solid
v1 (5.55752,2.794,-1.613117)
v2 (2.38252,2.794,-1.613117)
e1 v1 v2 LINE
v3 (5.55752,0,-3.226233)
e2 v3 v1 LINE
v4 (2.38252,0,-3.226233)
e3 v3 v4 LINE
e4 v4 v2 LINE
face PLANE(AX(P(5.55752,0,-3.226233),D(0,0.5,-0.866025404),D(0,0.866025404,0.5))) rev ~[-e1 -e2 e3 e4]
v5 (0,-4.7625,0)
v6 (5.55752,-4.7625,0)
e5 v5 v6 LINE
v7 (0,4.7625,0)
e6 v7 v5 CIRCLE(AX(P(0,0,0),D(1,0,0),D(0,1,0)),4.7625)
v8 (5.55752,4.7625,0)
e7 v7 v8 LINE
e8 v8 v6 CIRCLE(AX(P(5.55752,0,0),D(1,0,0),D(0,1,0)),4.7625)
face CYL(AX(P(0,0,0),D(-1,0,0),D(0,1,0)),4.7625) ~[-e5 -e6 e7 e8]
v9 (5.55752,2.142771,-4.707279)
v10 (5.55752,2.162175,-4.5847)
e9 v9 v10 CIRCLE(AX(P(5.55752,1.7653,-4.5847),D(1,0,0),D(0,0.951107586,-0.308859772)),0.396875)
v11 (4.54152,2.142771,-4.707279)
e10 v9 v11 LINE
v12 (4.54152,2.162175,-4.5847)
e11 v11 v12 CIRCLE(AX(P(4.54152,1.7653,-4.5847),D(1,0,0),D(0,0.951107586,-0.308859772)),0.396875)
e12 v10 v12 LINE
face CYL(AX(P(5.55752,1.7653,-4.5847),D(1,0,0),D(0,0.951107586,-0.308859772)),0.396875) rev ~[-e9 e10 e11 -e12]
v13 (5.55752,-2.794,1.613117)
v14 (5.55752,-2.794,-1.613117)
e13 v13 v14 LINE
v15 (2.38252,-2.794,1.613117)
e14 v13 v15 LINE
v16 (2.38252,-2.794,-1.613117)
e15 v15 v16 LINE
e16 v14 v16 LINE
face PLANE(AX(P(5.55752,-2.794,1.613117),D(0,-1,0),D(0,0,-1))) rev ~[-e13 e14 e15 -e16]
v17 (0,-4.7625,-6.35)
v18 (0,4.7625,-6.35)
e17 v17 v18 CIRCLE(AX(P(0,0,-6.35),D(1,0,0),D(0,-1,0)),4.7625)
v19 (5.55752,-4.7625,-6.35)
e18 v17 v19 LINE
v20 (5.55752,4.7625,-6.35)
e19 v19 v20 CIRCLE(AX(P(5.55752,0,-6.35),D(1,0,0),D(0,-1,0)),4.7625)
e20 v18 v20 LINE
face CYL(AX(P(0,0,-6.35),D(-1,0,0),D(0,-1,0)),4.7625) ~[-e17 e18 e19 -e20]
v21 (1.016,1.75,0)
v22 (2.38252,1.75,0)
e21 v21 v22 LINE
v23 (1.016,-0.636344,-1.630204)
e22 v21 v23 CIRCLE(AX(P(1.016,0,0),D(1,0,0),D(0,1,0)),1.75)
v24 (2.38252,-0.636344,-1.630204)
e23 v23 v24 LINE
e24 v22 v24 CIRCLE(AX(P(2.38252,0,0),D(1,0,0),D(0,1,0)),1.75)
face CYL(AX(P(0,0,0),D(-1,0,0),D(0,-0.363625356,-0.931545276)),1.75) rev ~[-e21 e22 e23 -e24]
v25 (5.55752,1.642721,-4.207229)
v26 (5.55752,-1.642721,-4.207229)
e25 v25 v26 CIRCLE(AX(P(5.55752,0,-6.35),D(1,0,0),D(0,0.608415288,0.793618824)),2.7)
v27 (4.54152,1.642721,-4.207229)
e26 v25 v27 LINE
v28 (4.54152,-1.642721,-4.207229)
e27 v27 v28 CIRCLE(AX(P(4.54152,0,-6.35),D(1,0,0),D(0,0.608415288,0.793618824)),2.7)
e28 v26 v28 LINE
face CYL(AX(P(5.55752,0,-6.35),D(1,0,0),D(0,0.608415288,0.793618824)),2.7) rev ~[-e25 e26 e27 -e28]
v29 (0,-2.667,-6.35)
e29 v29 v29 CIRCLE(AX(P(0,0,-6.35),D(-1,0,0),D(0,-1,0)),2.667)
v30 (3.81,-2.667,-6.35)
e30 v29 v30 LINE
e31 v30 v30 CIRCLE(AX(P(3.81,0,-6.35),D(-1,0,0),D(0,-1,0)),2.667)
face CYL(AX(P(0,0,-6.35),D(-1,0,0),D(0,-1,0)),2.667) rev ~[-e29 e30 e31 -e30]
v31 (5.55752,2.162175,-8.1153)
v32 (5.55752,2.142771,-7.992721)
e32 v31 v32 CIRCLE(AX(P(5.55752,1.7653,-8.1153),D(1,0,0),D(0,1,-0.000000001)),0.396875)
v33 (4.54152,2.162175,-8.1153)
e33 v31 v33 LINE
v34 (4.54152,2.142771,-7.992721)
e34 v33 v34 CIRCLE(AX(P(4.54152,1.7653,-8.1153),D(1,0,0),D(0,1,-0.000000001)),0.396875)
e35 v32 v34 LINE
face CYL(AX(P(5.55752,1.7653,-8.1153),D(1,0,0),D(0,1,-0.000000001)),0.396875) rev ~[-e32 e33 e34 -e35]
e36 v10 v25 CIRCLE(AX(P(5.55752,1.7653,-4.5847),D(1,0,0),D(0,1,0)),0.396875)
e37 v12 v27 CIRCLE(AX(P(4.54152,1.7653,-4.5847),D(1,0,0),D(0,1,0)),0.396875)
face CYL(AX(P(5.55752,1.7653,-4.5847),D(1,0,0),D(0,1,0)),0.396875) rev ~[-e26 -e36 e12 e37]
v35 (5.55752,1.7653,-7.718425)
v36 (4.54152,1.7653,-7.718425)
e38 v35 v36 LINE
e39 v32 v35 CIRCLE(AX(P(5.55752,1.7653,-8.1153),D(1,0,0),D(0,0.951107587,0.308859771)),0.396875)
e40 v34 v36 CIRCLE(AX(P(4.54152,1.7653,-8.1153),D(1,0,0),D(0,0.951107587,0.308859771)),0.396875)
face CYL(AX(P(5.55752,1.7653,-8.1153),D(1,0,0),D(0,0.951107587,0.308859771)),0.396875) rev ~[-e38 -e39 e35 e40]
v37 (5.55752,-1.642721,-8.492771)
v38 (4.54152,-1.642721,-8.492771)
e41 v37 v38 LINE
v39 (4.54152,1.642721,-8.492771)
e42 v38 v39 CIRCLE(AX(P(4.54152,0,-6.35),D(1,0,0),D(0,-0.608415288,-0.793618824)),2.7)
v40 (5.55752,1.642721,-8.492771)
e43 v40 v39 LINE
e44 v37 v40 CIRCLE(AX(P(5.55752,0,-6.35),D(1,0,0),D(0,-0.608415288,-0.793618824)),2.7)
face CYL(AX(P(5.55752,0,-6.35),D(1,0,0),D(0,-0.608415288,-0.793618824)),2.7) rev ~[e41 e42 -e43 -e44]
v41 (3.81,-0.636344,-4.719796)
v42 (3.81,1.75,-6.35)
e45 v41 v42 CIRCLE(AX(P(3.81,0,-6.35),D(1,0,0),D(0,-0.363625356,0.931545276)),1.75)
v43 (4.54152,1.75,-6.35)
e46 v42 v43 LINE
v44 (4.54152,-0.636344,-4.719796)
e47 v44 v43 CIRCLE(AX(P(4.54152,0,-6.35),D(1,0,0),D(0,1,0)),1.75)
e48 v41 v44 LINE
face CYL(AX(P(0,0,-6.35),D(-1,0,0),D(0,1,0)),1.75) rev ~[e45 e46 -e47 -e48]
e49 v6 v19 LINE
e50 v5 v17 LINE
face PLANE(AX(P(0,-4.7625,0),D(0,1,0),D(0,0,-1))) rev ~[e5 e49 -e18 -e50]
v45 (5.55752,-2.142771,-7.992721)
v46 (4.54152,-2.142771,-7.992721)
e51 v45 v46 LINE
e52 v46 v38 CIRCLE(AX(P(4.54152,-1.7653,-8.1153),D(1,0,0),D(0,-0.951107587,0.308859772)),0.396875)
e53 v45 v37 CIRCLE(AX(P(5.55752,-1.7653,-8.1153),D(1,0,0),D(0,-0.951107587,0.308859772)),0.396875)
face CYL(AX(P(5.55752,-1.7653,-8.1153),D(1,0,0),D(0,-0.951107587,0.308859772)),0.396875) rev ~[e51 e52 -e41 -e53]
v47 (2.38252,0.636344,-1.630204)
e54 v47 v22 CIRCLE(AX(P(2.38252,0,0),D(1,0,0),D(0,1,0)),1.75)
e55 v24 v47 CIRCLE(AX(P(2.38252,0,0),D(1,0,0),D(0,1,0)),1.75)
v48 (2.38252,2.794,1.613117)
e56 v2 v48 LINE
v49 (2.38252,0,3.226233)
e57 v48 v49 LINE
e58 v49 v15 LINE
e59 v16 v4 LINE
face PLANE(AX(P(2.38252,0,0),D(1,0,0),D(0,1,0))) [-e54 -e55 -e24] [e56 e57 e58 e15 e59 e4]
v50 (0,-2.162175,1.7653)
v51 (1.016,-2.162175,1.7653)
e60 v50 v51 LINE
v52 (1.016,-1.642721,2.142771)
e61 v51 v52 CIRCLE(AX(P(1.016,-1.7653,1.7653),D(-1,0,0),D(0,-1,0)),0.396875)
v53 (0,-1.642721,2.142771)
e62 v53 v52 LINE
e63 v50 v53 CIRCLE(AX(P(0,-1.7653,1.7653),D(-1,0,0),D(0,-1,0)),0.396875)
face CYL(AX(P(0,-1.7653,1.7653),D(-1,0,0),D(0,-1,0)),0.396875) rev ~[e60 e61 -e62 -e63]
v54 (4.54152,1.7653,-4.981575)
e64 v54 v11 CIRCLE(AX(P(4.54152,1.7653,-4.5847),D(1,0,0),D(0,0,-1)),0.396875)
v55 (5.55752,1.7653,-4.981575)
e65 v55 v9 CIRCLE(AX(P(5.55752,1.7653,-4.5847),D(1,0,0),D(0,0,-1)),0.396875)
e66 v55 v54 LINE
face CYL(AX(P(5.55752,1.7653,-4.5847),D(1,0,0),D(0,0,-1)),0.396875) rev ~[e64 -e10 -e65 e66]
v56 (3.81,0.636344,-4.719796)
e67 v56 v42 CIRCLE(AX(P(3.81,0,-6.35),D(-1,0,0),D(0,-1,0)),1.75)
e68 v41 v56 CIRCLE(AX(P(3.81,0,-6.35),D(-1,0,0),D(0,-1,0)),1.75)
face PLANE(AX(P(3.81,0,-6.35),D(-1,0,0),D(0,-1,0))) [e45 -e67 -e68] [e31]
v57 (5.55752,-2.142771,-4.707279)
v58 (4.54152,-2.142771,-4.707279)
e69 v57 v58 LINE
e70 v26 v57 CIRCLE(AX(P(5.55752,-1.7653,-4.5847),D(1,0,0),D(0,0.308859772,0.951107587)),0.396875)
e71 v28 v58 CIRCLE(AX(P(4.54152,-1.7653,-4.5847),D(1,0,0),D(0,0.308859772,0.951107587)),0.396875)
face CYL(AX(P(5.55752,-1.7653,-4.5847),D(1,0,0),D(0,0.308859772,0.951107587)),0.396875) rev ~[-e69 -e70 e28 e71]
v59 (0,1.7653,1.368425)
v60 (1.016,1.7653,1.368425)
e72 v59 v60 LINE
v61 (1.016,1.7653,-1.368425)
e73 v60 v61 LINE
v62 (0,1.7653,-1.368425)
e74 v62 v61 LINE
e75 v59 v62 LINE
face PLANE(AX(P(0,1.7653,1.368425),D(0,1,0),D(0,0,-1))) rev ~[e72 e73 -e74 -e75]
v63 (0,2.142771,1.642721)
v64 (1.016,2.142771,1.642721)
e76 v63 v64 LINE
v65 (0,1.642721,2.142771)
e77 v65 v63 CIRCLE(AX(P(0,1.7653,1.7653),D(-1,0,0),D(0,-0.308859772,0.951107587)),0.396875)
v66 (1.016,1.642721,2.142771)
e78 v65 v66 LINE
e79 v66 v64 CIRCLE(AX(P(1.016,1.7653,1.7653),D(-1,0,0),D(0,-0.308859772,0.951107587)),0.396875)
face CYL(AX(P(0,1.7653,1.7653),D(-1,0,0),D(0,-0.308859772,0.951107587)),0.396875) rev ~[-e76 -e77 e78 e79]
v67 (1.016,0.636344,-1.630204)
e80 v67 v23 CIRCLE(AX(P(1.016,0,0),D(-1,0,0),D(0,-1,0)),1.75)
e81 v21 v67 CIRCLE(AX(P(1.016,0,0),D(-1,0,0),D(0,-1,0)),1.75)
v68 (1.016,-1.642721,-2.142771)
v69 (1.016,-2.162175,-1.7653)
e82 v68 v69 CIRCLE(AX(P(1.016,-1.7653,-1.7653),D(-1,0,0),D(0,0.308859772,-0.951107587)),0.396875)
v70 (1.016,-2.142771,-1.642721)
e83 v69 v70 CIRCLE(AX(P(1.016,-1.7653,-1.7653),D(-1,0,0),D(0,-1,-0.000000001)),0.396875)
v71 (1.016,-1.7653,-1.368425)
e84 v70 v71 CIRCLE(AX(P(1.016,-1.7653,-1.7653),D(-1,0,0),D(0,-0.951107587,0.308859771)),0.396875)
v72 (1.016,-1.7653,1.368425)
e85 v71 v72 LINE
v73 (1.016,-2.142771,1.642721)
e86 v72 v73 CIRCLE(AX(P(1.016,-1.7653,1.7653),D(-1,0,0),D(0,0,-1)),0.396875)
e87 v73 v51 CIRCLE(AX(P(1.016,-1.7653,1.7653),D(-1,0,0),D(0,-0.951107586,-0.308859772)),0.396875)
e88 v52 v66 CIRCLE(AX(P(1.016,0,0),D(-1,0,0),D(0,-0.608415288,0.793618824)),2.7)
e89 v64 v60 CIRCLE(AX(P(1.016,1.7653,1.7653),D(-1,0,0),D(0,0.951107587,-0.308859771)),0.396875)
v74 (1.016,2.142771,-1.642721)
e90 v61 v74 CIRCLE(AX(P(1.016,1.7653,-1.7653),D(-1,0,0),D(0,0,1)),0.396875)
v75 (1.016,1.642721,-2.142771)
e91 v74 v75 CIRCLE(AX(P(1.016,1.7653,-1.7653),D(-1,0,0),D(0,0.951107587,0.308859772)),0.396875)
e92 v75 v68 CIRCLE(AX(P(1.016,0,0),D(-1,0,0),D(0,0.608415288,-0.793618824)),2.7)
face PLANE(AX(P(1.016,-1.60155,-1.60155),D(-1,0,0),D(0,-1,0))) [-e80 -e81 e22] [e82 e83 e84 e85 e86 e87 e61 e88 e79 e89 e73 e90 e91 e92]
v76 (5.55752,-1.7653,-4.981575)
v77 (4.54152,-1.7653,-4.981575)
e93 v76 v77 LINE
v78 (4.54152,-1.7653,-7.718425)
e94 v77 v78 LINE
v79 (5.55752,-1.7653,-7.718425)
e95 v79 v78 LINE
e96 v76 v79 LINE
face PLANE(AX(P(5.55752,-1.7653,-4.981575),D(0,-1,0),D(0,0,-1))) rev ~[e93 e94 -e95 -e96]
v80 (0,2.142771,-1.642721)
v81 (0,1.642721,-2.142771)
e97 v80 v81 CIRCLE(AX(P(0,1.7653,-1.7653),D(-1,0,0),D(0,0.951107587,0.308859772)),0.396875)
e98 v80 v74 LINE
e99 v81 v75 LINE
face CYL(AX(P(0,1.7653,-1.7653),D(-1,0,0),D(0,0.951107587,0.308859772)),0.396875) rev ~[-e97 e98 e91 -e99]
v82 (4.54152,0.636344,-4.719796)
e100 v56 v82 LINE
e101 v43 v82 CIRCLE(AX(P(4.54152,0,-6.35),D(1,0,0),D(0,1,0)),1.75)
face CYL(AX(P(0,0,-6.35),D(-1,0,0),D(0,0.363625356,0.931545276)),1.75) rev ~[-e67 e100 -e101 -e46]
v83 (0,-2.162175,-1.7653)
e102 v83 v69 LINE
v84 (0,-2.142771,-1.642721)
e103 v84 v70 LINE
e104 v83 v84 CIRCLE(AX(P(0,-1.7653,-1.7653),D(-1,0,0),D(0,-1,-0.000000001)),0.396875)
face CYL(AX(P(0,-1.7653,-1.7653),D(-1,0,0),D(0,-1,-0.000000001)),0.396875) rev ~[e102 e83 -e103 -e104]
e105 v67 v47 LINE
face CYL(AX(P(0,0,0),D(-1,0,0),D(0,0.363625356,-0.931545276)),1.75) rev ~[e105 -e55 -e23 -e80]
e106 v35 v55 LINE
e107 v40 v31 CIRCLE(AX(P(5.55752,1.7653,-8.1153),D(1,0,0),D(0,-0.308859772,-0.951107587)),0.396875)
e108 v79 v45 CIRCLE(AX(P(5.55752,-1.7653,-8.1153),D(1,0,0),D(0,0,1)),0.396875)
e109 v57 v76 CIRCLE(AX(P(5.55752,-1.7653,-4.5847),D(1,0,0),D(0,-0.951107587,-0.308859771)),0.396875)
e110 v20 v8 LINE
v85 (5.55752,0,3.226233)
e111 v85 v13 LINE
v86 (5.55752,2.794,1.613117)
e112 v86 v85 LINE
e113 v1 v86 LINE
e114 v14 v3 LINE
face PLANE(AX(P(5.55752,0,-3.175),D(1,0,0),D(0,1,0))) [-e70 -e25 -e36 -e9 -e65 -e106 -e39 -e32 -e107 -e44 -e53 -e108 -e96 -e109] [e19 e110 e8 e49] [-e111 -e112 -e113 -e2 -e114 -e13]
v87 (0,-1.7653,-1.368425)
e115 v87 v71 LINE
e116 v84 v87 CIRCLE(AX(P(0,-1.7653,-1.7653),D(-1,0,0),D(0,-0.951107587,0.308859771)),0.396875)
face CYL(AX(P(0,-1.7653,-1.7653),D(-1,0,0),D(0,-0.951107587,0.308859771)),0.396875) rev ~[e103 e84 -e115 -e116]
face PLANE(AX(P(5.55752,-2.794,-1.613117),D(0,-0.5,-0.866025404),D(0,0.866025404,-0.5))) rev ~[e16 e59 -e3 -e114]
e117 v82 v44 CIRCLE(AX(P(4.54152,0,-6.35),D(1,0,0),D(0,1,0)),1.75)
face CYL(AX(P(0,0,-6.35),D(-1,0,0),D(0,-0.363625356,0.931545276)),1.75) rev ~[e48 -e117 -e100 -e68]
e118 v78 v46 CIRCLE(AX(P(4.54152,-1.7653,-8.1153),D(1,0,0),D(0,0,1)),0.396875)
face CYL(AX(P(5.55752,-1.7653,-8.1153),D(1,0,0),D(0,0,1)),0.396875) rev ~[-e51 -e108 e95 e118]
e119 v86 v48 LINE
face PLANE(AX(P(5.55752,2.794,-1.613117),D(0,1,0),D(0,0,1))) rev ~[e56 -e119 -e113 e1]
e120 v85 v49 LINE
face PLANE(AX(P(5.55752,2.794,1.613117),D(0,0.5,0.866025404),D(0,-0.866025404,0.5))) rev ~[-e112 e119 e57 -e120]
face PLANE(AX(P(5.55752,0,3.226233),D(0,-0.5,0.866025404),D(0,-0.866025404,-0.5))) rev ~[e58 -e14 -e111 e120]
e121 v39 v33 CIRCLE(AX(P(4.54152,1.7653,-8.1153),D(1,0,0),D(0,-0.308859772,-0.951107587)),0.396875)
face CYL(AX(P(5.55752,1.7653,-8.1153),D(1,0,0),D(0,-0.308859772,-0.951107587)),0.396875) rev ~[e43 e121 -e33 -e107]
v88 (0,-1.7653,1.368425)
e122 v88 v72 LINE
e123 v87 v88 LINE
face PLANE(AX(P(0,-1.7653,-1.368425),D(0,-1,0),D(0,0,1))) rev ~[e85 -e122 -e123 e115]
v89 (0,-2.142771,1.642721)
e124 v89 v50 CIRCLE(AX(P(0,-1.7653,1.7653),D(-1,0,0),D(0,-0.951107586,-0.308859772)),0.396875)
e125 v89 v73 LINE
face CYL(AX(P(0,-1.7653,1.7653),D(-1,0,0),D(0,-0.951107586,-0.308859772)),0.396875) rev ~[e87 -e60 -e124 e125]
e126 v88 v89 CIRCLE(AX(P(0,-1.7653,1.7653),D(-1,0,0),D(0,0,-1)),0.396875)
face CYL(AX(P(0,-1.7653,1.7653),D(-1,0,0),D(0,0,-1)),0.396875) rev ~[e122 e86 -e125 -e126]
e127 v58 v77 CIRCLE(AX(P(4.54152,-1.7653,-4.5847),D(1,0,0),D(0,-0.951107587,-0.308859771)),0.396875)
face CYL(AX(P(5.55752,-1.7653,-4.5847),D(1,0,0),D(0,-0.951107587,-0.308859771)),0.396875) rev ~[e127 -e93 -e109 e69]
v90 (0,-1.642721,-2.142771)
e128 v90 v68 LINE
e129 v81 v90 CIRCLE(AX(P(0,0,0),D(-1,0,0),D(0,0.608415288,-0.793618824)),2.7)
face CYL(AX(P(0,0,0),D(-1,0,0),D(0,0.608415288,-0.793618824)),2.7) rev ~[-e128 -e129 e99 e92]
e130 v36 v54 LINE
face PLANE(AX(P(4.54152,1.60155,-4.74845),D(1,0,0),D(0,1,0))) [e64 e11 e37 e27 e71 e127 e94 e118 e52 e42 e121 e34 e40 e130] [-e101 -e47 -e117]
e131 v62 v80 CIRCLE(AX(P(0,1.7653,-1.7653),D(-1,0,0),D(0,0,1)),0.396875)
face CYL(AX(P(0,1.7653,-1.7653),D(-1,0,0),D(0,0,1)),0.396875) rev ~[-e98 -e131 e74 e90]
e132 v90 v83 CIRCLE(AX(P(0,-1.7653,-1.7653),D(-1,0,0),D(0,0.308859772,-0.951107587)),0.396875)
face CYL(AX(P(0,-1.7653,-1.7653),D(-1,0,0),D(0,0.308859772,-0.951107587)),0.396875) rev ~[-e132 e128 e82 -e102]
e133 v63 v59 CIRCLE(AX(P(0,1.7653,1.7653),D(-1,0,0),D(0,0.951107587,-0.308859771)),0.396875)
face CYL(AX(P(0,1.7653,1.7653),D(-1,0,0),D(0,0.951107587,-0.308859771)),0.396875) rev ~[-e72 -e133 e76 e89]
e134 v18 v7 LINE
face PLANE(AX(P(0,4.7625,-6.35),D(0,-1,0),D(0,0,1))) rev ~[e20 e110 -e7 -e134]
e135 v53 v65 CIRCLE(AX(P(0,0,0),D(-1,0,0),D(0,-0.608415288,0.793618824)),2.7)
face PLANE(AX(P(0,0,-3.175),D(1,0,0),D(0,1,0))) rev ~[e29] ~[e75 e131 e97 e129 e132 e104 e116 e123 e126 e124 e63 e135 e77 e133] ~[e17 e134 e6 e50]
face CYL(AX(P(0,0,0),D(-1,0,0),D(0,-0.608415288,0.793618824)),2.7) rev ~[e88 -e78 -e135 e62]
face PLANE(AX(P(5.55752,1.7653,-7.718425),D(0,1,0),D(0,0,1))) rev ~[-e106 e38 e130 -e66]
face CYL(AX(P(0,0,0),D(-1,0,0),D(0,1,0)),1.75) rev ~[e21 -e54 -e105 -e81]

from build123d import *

# Parameters (mm, degrees)
F1_DEPTH = 5.55752
F2_R     = 1.75
F3_DEPTH = 1.016
F4_R     = 1.75
F5_DEPTH = 1.016
F6_DEPTH = 3.175
F7_R     = 2.667
F7_R_2   = 1.75
F8_DEPTH = 3.81


# Not quite as in the source:
# - a feature names something its author has since deleted; it is built from what else it names


with BuildPart() as f1:
    # F0 (on Right) → F1 (new body)
    with BuildSketch(Plane.YZ):
        with BuildLine():
            ThreePointArc((0.636344373, -4.7197957677), (2.2310225415, -4.2076055743), (3.5497579143, -3.175))
            ThreePointArc((3.5497579143, -3.175), (2.2310225415, -2.1423944257), (0.636344373, -1.6302042323))
            ThreePointArc((0.636344373, -1.6302042323), (0, -1.75), (-0.636344373, -1.6302042323))
            ThreePointArc((-0.636344373, -1.6302042323), (-2.2310225415, -2.1423944257), (-3.5497579143, -3.175))
            ThreePointArc((-3.5497579143, -3.175), (-2.2310225415, -4.2076055743), (-0.636344373, -4.7197957677))
            ThreePointArc((-0.636344373, -4.7197957677), (0, -4.6), (0.636344373, -4.7197957677))
        make_face()
        with BuildLine():
            ThreePointArc((3.5497579143, -3.175), (4.4489958596, -1.6993652025), (4.7625, 0))
            ThreePointArc((4.7625, 0), (0, 4.7625), (-4.7625, 0))
            ThreePointArc((-4.7625, 0), (-4.4489958596, -1.6993652025), (-3.5497579143, -3.175))
            ThreePointArc((-3.5497579143, -3.175), (-2.2310225415, -2.1423944257), (-0.636344373, -1.6302042323))
            ThreePointArc((-0.636344373, -1.6302042323), (-0.9871416685, 1.4450091094), (1.75, 0))
            ThreePointArc((1.75, 0), (1.4450091094, -0.9871416685), (0.636344373, -1.6302042323))
            ThreePointArc((0.636344373, -1.6302042323), (2.2310225415, -2.1423944257), (3.5497579143, -3.175))
        make_face()
        with BuildLine():
            Line((4.7625, -6.35), (4.7625, 0))
            ThreePointArc((4.7625, 0), (4.4489958596, -1.6993652025), (3.5497579143, -3.175))
            ThreePointArc((3.5497579143, -3.175), (4.4489958596, -4.6506347975), (4.7625, -6.35))
        make_face()
        with BuildLine():
            ThreePointArc((4.7625, -6.35), (4.4489958596, -4.6506347975), (3.5497579143, -3.175))
            ThreePointArc((3.5497579143, -3.175), (2.2310225415, -4.2076055743), (0.636344373, -4.7197957677))
            ThreePointArc((0.636344373, -4.7197957677), (1.4450091094, -5.3628583315), (1.75, -6.35))
            ThreePointArc((1.75, -6.35), (-0.9871416685, -7.7950091094), (-0.636344373, -4.7197957677))
            ThreePointArc((-0.636344373, -4.7197957677), (-2.2310225415, -4.2076055743), (-3.5497579143, -3.175))
            ThreePointArc((-3.5497579143, -3.175), (-4.4489958596, -4.6506347975), (-4.7625, -6.35))
            ThreePointArc((-4.7625, -6.35), (0, -11.1125), (4.7625, -6.35))
        make_face()
        with BuildLine():
            ThreePointArc((-3.5497579143, -3.175), (-4.4489958596, -1.6993652025), (-4.7625, 0))
            Line((-4.7625, 0), (-4.7625, -6.35))
            ThreePointArc((-4.7625, -6.35), (-4.4489958596, -4.6506347975), (-3.5497579143, -3.175))
        make_face()
    extrude(amount=F1_DEPTH)

    # F2 (on face) → F3 (cut)
    with BuildSketch(Plane.YZ.offset(5.55752)):
        with BuildLine():
            ThreePointArc((1.368425, -4.5847), (1.4846669962, -4.8653330038), (1.7653, -4.981575))
            Line((1.7653, -4.981575), (1.7653, -4.5847))
            Line((1.7653, -4.5847), (1.368425, -4.5847))
        make_face()
        with BuildLine():
            Line((1.7653, -4.5847), (1.7653, -4.981575))
            ThreePointArc((1.7653, -4.981575), (1.9986038099, -4.9057593371), (2.1427708235, -4.7072787218))
            ThreePointArc((2.1427708235, -4.7072787218), (1.9091883092, -4.4408116908), (1.6427212782, -4.2072291765))
            ThreePointArc((1.6427212782, -4.2072291765), (1.4442406629, -4.3513961901), (1.368425, -4.5847))
            Line((1.368425, -4.5847), (1.7653, -4.5847))
        make_face()
        with BuildLine():
            ThreePointArc((1.7653, -7.718425), (1.4846669962, -7.8346669962), (1.368425, -8.1153))
            Line((1.368425, -8.1153), (1.7653, -8.1153))
            Line((1.7653, -8.1153), (1.7653, -7.718425))
        make_face()
        with BuildLine():
            Line((1.7653, -8.1153), (1.368425, -8.1153))
            ThreePointArc((1.368425, -8.1153), (1.4442406629, -8.3486038099), (1.6427212782, -8.4927708235))
            ThreePointArc((1.6427212782, -8.4927708235), (1.9091883092, -8.2591883092), (2.1427708235, -7.9927212782))
            ThreePointArc((2.1427708235, -7.9927212782), (1.9986038099, -7.7942406629), (1.7653, -7.718425))
            Line((1.7653, -7.718425), (1.7653, -8.1153))
        make_face()
        with BuildLine():
            Line((-1.368425, -8.1153), (-1.7653, -8.1153))
            Line((-1.7653, -8.1153), (-1.7653, -7.718425))
            ThreePointArc((-1.7653, -7.718425), (-1.9986038099, -7.7942406629), (-2.1427708235, -7.9927212782))
            ThreePointArc((-2.1427708235, -7.9927212782), (-1.9091883092, -8.2591883092), (-1.6427212782, -8.4927708235))
            ThreePointArc((-1.6427212782, -8.4927708235), (-1.4442406629, -8.3486038099), (-1.368425, -8.1153))
        make_face()
        with BuildLine():
            Line((-1.7653, -7.718425), (-1.7653, -8.1153))
            Line((-1.7653, -8.1153), (-1.368425, -8.1153))
            ThreePointArc((-1.368425, -8.1153), (-1.4846669962, -7.8346669962), (-1.7653, -7.718425))
        make_face()
        with BuildLine():
            Line((-1.7653, -4.5847), (-1.7653, -4.981575))
            ThreePointArc((-1.7653, -4.981575), (-1.4846669962, -4.8653330038), (-1.368425, -4.5847))
            Line((-1.368425, -4.5847), (-1.7653, -4.5847))
        make_face()
        with BuildLine():
            ThreePointArc((-2.1427708235, -4.7072787218), (-1.9986038099, -4.9057593371), (-1.7653, -4.981575))
            Line((-1.7653, -4.981575), (-1.7653, -4.5847))
            Line((-1.7653, -4.5847), (-1.368425, -4.5847))
            ThreePointArc((-1.368425, -4.5847), (-1.4442406629, -4.3513961901), (-1.6427212782, -4.2072291765))
            ThreePointArc((-1.6427212782, -4.2072291765), (-1.9091883092, -4.4408116908), (-2.1427708235, -4.7072787218))
        make_face()
        with BuildLine():
            ThreePointArc((-1.7653, -7.718425), (-1.4846669962, -7.8346669962), (-1.368425, -8.1153))
            Line((-1.368425, -8.1153), (1.368425, -8.1153))
            ThreePointArc((1.368425, -8.1153), (1.4846669962, -7.8346669962), (1.7653, -7.718425))
            Line((1.7653, -7.718425), (1.7653, -4.981575))
            ThreePointArc((1.7653, -4.981575), (1.4846669962, -4.8653330038), (1.368425, -4.5847))
            Line((1.368425, -4.5847), (-1.368425, -4.5847))
            ThreePointArc((-1.368425, -4.5847), (-1.4846669962, -4.8653330038), (-1.7653, -4.981575))
            Line((-1.7653, -4.981575), (-1.7653, -7.718425))
        make_face()
        with Locations((0, -6.35)):
            Circle(F2_R, mode=Mode.SUBTRACT)
        with BuildLine():
            ThreePointArc((-1.6427212782, -4.2072291765), (-2.0459330038, -4.3040669962), (-2.1427708235, -4.7072787218))
            ThreePointArc((-2.1427708235, -4.7072787218), (-1.9091883092, -4.4408116908), (-1.6427212782, -4.2072291765))
        make_face()
        with BuildLine():
            ThreePointArc((1.6427212782, -4.2072291765), (1.9091883092, -4.4408116908), (2.1427708235, -4.7072787218))
            ThreePointArc((2.1427708235, -4.7072787218), (2.1572939405, -4.6467525283), (2.162175, -4.5847))
            ThreePointArc((2.162175, -4.5847), (1.9986038099, -4.2636406629), (1.6427212782, -4.2072291765))
        make_face()
        with BuildLine():
            ThreePointArc((2.1427708235, -7.9927212782), (1.9091883092, -8.2591883092), (1.6427212782, -8.4927708235))
            ThreePointArc((1.6427212782, -8.4927708235), (1.9986038099, -8.4363593371), (2.162175, -8.1153))
            ThreePointArc((2.162175, -8.1153), (2.1572939405, -8.0532474717), (2.1427708235, -7.9927212782))
        make_face()
        with BuildLine():
            ThreePointArc((-2.1427708235, -7.9927212782), (-2.0459330038, -8.3959330038), (-1.6427212782, -8.4927708235))
            ThreePointArc((-1.6427212782, -8.4927708235), (-1.9091883092, -8.2591883092), (-2.1427708235, -7.9927212782))
        make_face()
        with BuildLine():
            ThreePointArc((-1.6427212782, -4.2072291765), (-1.4442406629, -4.3513961901), (-1.368425, -4.5847))
            Line((-1.368425, -4.5847), (1.368425, -4.5847))
            ThreePointArc((1.368425, -4.5847), (1.4442406629, -4.3513961901), (1.6427212782, -4.2072291765))
            ThreePointArc((1.6427212782, -4.2072291765), (0, -3.65), (-1.6427212782, -4.2072291765))
        make_face()
        with BuildLine():
            Line((1.368425, -8.1153), (-1.368425, -8.1153))
            ThreePointArc((-1.368425, -8.1153), (-1.4442406629, -8.3486038099), (-1.6427212782, -8.4927708235))
            ThreePointArc((-1.6427212782, -8.4927708235), (0, -9.05), (1.6427212782, -8.4927708235))
            ThreePointArc((1.6427212782, -8.4927708235), (1.4442406629, -8.3486038099), (1.368425, -8.1153))
        make_face()
    extrude(amount=-F3_DEPTH, mode=Mode.SUBTRACT)

    # F4 (on face) → F5 (cut)
    with BuildSketch(Plane(origin=(0, 0, 0), x_dir=(0, -1, 0), z_dir=(-1, 0, 0))):
        with BuildLine():
            ThreePointArc((1.7653, -1.368425), (1.4846669962, -1.4846669962), (1.368425, -1.7653))
            Line((1.368425, -1.7653), (1.7653, -1.7653))
            Line((1.7653, -1.7653), (1.7653, -1.368425))
        make_face()
        with BuildLine():
            Line((1.7653, -1.7653), (1.368425, -1.7653))
            ThreePointArc((1.368425, -1.7653), (1.4442406629, -1.9986038099), (1.6427212782, -2.1427708235))
            ThreePointArc((1.6427212782, -2.1427708235), (1.9091883092, -1.9091883092), (2.1427708235, -1.6427212782))
            ThreePointArc((2.1427708235, -1.6427212782), (1.9986038099, -1.4442406629), (1.7653, -1.368425))
            Line((1.7653, -1.368425), (1.7653, -1.7653))
        make_face()
        with BuildLine():
            Line((-1.7653, -1.368425), (-1.7653, -1.7653))
            Line((-1.7653, -1.7653), (-1.368425, -1.7653))
            ThreePointArc((-1.368425, -1.7653), (-1.4846669962, -1.4846669962), (-1.7653, -1.368425))
        make_face()
        with BuildLine():
            Line((-1.368425, -1.7653), (-1.7653, -1.7653))
            Line((-1.7653, -1.7653), (-1.7653, -1.368425))
            ThreePointArc((-1.7653, -1.368425), (-1.9986038099, -1.4442406629), (-2.1427708235, -1.6427212782))
            ThreePointArc((-2.1427708235, -1.6427212782), (-1.9091883092, -1.9091883092), (-1.6427212782, -2.1427708235))
            ThreePointArc((-1.6427212782, -2.1427708235), (-1.4442406629, -1.9986038099), (-1.368425, -1.7653))
        make_face()
        with BuildLine():
            Line((-1.7653, 1.7653), (-1.7653, 1.368425))
            ThreePointArc((-1.7653, 1.368425), (-1.4846669962, 1.4846669962), (-1.368425, 1.7653))
            Line((-1.368425, 1.7653), (-1.7653, 1.7653))
        make_face()
        with BuildLine():
            ThreePointArc((-2.1427708235, 1.6427212782), (-1.9986038099, 1.4442406629), (-1.7653, 1.368425))
            Line((-1.7653, 1.368425), (-1.7653, 1.7653))
            Line((-1.7653, 1.7653), (-1.368425, 1.7653))
            ThreePointArc((-1.368425, 1.7653), (-1.4442406629, 1.9986038099), (-1.6427212782, 2.1427708235))
            ThreePointArc((-1.6427212782, 2.1427708235), (-1.9091883092, 1.9091883092), (-2.1427708235, 1.6427212782))
        make_face()
        with BuildLine():
            ThreePointArc((1.368425, 1.7653), (1.4846669962, 1.4846669962), (1.7653, 1.368425))
            Line((1.7653, 1.368425), (1.7653, 1.7653))
            Line((1.7653, 1.7653), (1.368425, 1.7653))
        make_face()
        with BuildLine():
            Line((1.7653, 1.7653), (1.7653, 1.368425))
            ThreePointArc((1.7653, 1.368425), (1.9986038099, 1.4442406629), (2.1427708235, 1.6427212782))
            ThreePointArc((2.1427708235, 1.6427212782), (1.9091883092, 1.9091883092), (1.6427212782, 2.1427708235))
            ThreePointArc((1.6427212782, 2.1427708235), (1.4442406629, 1.9986038099), (1.368425, 1.7653))
            Line((1.368425, 1.7653), (1.7653, 1.7653))
        make_face()
        with BuildLine():
            ThreePointArc((-1.7653, -1.368425), (-1.4846669962, -1.4846669962), (-1.368425, -1.7653))
            Line((-1.368425, -1.7653), (1.368425, -1.7653))
            ThreePointArc((1.368425, -1.7653), (1.4846669962, -1.4846669962), (1.7653, -1.368425))
            Line((1.7653, -1.368425), (1.7653, 1.368425))
            ThreePointArc((1.7653, 1.368425), (1.4846669962, 1.4846669962), (1.368425, 1.7653))
            Line((1.368425, 1.7653), (-1.368425, 1.7653))
            ThreePointArc((-1.368425, 1.7653), (-1.4846669962, 1.4846669962), (-1.7653, 1.368425))
            Line((-1.7653, 1.368425), (-1.7653, -1.368425))
        make_face()
        Circle(F4_R, mode=Mode.SUBTRACT)
        with BuildLine():
            ThreePointArc((-1.6427212782, 2.1427708235), (-2.0459330038, 2.0459330038), (-2.1427708235, 1.6427212782))
            ThreePointArc((-2.1427708235, 1.6427212782), (-1.9091883092, 1.9091883092), (-1.6427212782, 2.1427708235))
        make_face()
        with BuildLine():
            ThreePointArc((1.6427212782, 2.1427708235), (1.9091883092, 1.9091883092), (2.1427708235, 1.6427212782))
            ThreePointArc((2.1427708235, 1.6427212782), (2.1572939405, 1.7032474717), (2.162175, 1.7653))
            ThreePointArc((2.162175, 1.7653), (1.9986038099, 2.0863593371), (1.6427212782, 2.1427708235))
        make_face()
        with BuildLine():
            ThreePointArc((2.1427708235, -1.6427212782), (1.9091883092, -1.9091883092), (1.6427212782, -2.1427708235))
            ThreePointArc((1.6427212782, -2.1427708235), (1.9986038099, -2.0863593371), (2.162175, -1.7653))
            ThreePointArc((2.162175, -1.7653), (2.1572939405, -1.7032474717), (2.1427708235, -1.6427212782))
        make_face()
        with BuildLine():
            ThreePointArc((-2.1427708235, -1.6427212782), (-2.0459330038, -2.0459330038), (-1.6427212782, -2.1427708235))
            ThreePointArc((-1.6427212782, -2.1427708235), (-1.9091883092, -1.9091883092), (-2.1427708235, -1.6427212782))
        make_face()
        with BuildLine():
            Line((1.368425, -1.7653), (-1.368425, -1.7653))
            ThreePointArc((-1.368425, -1.7653), (-1.4442406629, -1.9986038099), (-1.6427212782, -2.1427708235))
            ThreePointArc((-1.6427212782, -2.1427708235), (0, -2.7), (1.6427212782, -2.1427708235))
            ThreePointArc((1.6427212782, -2.1427708235), (1.4442406629, -1.9986038099), (1.368425, -1.7653))
        make_face()
        with BuildLine():
            ThreePointArc((-1.6427212782, 2.1427708235), (-1.4442406629, 1.9986038099), (-1.368425, 1.7653))
            Line((-1.368425, 1.7653), (1.368425, 1.7653))
            ThreePointArc((1.368425, 1.7653), (1.4442406629, 1.9986038099), (1.6427212782, 2.1427708235))
            ThreePointArc((1.6427212782, 2.1427708235), (0, 2.7), (-1.6427212782, 2.1427708235))
        make_face()
    extrude(amount=-F5_DEPTH, mode=Mode.SUBTRACT)

    # F2 (on face) → F6 (cut)
    with BuildSketch(Plane.YZ.offset(5.55752)):
        Polygon((-2.794, -1.6131166521), (0, -3.2262333042), (2.794, -1.6131166521), (2.794, 1.6131166521), (0, 3.2262333042), (-2.794, 1.6131166521), align=None)
        Circle(F2_R, mode=Mode.SUBTRACT)
    extrude(amount=-F6_DEPTH, mode=Mode.SUBTRACT)

    # F7 (on face) → F8 (cut)
    with BuildSketch(Plane(origin=(0, 0, 0), x_dir=(0, -1, 0), z_dir=(-1, 0, 0))):
        with Locations((0, -6.35)):
            Circle(F7_R)
        with Locations((0, -6.35)):
            Circle(F7_R_2, mode=Mode.SUBTRACT)
    extrude(amount=-F8_DEPTH, mode=Mode.SUBTRACT)


solid = f1.part
